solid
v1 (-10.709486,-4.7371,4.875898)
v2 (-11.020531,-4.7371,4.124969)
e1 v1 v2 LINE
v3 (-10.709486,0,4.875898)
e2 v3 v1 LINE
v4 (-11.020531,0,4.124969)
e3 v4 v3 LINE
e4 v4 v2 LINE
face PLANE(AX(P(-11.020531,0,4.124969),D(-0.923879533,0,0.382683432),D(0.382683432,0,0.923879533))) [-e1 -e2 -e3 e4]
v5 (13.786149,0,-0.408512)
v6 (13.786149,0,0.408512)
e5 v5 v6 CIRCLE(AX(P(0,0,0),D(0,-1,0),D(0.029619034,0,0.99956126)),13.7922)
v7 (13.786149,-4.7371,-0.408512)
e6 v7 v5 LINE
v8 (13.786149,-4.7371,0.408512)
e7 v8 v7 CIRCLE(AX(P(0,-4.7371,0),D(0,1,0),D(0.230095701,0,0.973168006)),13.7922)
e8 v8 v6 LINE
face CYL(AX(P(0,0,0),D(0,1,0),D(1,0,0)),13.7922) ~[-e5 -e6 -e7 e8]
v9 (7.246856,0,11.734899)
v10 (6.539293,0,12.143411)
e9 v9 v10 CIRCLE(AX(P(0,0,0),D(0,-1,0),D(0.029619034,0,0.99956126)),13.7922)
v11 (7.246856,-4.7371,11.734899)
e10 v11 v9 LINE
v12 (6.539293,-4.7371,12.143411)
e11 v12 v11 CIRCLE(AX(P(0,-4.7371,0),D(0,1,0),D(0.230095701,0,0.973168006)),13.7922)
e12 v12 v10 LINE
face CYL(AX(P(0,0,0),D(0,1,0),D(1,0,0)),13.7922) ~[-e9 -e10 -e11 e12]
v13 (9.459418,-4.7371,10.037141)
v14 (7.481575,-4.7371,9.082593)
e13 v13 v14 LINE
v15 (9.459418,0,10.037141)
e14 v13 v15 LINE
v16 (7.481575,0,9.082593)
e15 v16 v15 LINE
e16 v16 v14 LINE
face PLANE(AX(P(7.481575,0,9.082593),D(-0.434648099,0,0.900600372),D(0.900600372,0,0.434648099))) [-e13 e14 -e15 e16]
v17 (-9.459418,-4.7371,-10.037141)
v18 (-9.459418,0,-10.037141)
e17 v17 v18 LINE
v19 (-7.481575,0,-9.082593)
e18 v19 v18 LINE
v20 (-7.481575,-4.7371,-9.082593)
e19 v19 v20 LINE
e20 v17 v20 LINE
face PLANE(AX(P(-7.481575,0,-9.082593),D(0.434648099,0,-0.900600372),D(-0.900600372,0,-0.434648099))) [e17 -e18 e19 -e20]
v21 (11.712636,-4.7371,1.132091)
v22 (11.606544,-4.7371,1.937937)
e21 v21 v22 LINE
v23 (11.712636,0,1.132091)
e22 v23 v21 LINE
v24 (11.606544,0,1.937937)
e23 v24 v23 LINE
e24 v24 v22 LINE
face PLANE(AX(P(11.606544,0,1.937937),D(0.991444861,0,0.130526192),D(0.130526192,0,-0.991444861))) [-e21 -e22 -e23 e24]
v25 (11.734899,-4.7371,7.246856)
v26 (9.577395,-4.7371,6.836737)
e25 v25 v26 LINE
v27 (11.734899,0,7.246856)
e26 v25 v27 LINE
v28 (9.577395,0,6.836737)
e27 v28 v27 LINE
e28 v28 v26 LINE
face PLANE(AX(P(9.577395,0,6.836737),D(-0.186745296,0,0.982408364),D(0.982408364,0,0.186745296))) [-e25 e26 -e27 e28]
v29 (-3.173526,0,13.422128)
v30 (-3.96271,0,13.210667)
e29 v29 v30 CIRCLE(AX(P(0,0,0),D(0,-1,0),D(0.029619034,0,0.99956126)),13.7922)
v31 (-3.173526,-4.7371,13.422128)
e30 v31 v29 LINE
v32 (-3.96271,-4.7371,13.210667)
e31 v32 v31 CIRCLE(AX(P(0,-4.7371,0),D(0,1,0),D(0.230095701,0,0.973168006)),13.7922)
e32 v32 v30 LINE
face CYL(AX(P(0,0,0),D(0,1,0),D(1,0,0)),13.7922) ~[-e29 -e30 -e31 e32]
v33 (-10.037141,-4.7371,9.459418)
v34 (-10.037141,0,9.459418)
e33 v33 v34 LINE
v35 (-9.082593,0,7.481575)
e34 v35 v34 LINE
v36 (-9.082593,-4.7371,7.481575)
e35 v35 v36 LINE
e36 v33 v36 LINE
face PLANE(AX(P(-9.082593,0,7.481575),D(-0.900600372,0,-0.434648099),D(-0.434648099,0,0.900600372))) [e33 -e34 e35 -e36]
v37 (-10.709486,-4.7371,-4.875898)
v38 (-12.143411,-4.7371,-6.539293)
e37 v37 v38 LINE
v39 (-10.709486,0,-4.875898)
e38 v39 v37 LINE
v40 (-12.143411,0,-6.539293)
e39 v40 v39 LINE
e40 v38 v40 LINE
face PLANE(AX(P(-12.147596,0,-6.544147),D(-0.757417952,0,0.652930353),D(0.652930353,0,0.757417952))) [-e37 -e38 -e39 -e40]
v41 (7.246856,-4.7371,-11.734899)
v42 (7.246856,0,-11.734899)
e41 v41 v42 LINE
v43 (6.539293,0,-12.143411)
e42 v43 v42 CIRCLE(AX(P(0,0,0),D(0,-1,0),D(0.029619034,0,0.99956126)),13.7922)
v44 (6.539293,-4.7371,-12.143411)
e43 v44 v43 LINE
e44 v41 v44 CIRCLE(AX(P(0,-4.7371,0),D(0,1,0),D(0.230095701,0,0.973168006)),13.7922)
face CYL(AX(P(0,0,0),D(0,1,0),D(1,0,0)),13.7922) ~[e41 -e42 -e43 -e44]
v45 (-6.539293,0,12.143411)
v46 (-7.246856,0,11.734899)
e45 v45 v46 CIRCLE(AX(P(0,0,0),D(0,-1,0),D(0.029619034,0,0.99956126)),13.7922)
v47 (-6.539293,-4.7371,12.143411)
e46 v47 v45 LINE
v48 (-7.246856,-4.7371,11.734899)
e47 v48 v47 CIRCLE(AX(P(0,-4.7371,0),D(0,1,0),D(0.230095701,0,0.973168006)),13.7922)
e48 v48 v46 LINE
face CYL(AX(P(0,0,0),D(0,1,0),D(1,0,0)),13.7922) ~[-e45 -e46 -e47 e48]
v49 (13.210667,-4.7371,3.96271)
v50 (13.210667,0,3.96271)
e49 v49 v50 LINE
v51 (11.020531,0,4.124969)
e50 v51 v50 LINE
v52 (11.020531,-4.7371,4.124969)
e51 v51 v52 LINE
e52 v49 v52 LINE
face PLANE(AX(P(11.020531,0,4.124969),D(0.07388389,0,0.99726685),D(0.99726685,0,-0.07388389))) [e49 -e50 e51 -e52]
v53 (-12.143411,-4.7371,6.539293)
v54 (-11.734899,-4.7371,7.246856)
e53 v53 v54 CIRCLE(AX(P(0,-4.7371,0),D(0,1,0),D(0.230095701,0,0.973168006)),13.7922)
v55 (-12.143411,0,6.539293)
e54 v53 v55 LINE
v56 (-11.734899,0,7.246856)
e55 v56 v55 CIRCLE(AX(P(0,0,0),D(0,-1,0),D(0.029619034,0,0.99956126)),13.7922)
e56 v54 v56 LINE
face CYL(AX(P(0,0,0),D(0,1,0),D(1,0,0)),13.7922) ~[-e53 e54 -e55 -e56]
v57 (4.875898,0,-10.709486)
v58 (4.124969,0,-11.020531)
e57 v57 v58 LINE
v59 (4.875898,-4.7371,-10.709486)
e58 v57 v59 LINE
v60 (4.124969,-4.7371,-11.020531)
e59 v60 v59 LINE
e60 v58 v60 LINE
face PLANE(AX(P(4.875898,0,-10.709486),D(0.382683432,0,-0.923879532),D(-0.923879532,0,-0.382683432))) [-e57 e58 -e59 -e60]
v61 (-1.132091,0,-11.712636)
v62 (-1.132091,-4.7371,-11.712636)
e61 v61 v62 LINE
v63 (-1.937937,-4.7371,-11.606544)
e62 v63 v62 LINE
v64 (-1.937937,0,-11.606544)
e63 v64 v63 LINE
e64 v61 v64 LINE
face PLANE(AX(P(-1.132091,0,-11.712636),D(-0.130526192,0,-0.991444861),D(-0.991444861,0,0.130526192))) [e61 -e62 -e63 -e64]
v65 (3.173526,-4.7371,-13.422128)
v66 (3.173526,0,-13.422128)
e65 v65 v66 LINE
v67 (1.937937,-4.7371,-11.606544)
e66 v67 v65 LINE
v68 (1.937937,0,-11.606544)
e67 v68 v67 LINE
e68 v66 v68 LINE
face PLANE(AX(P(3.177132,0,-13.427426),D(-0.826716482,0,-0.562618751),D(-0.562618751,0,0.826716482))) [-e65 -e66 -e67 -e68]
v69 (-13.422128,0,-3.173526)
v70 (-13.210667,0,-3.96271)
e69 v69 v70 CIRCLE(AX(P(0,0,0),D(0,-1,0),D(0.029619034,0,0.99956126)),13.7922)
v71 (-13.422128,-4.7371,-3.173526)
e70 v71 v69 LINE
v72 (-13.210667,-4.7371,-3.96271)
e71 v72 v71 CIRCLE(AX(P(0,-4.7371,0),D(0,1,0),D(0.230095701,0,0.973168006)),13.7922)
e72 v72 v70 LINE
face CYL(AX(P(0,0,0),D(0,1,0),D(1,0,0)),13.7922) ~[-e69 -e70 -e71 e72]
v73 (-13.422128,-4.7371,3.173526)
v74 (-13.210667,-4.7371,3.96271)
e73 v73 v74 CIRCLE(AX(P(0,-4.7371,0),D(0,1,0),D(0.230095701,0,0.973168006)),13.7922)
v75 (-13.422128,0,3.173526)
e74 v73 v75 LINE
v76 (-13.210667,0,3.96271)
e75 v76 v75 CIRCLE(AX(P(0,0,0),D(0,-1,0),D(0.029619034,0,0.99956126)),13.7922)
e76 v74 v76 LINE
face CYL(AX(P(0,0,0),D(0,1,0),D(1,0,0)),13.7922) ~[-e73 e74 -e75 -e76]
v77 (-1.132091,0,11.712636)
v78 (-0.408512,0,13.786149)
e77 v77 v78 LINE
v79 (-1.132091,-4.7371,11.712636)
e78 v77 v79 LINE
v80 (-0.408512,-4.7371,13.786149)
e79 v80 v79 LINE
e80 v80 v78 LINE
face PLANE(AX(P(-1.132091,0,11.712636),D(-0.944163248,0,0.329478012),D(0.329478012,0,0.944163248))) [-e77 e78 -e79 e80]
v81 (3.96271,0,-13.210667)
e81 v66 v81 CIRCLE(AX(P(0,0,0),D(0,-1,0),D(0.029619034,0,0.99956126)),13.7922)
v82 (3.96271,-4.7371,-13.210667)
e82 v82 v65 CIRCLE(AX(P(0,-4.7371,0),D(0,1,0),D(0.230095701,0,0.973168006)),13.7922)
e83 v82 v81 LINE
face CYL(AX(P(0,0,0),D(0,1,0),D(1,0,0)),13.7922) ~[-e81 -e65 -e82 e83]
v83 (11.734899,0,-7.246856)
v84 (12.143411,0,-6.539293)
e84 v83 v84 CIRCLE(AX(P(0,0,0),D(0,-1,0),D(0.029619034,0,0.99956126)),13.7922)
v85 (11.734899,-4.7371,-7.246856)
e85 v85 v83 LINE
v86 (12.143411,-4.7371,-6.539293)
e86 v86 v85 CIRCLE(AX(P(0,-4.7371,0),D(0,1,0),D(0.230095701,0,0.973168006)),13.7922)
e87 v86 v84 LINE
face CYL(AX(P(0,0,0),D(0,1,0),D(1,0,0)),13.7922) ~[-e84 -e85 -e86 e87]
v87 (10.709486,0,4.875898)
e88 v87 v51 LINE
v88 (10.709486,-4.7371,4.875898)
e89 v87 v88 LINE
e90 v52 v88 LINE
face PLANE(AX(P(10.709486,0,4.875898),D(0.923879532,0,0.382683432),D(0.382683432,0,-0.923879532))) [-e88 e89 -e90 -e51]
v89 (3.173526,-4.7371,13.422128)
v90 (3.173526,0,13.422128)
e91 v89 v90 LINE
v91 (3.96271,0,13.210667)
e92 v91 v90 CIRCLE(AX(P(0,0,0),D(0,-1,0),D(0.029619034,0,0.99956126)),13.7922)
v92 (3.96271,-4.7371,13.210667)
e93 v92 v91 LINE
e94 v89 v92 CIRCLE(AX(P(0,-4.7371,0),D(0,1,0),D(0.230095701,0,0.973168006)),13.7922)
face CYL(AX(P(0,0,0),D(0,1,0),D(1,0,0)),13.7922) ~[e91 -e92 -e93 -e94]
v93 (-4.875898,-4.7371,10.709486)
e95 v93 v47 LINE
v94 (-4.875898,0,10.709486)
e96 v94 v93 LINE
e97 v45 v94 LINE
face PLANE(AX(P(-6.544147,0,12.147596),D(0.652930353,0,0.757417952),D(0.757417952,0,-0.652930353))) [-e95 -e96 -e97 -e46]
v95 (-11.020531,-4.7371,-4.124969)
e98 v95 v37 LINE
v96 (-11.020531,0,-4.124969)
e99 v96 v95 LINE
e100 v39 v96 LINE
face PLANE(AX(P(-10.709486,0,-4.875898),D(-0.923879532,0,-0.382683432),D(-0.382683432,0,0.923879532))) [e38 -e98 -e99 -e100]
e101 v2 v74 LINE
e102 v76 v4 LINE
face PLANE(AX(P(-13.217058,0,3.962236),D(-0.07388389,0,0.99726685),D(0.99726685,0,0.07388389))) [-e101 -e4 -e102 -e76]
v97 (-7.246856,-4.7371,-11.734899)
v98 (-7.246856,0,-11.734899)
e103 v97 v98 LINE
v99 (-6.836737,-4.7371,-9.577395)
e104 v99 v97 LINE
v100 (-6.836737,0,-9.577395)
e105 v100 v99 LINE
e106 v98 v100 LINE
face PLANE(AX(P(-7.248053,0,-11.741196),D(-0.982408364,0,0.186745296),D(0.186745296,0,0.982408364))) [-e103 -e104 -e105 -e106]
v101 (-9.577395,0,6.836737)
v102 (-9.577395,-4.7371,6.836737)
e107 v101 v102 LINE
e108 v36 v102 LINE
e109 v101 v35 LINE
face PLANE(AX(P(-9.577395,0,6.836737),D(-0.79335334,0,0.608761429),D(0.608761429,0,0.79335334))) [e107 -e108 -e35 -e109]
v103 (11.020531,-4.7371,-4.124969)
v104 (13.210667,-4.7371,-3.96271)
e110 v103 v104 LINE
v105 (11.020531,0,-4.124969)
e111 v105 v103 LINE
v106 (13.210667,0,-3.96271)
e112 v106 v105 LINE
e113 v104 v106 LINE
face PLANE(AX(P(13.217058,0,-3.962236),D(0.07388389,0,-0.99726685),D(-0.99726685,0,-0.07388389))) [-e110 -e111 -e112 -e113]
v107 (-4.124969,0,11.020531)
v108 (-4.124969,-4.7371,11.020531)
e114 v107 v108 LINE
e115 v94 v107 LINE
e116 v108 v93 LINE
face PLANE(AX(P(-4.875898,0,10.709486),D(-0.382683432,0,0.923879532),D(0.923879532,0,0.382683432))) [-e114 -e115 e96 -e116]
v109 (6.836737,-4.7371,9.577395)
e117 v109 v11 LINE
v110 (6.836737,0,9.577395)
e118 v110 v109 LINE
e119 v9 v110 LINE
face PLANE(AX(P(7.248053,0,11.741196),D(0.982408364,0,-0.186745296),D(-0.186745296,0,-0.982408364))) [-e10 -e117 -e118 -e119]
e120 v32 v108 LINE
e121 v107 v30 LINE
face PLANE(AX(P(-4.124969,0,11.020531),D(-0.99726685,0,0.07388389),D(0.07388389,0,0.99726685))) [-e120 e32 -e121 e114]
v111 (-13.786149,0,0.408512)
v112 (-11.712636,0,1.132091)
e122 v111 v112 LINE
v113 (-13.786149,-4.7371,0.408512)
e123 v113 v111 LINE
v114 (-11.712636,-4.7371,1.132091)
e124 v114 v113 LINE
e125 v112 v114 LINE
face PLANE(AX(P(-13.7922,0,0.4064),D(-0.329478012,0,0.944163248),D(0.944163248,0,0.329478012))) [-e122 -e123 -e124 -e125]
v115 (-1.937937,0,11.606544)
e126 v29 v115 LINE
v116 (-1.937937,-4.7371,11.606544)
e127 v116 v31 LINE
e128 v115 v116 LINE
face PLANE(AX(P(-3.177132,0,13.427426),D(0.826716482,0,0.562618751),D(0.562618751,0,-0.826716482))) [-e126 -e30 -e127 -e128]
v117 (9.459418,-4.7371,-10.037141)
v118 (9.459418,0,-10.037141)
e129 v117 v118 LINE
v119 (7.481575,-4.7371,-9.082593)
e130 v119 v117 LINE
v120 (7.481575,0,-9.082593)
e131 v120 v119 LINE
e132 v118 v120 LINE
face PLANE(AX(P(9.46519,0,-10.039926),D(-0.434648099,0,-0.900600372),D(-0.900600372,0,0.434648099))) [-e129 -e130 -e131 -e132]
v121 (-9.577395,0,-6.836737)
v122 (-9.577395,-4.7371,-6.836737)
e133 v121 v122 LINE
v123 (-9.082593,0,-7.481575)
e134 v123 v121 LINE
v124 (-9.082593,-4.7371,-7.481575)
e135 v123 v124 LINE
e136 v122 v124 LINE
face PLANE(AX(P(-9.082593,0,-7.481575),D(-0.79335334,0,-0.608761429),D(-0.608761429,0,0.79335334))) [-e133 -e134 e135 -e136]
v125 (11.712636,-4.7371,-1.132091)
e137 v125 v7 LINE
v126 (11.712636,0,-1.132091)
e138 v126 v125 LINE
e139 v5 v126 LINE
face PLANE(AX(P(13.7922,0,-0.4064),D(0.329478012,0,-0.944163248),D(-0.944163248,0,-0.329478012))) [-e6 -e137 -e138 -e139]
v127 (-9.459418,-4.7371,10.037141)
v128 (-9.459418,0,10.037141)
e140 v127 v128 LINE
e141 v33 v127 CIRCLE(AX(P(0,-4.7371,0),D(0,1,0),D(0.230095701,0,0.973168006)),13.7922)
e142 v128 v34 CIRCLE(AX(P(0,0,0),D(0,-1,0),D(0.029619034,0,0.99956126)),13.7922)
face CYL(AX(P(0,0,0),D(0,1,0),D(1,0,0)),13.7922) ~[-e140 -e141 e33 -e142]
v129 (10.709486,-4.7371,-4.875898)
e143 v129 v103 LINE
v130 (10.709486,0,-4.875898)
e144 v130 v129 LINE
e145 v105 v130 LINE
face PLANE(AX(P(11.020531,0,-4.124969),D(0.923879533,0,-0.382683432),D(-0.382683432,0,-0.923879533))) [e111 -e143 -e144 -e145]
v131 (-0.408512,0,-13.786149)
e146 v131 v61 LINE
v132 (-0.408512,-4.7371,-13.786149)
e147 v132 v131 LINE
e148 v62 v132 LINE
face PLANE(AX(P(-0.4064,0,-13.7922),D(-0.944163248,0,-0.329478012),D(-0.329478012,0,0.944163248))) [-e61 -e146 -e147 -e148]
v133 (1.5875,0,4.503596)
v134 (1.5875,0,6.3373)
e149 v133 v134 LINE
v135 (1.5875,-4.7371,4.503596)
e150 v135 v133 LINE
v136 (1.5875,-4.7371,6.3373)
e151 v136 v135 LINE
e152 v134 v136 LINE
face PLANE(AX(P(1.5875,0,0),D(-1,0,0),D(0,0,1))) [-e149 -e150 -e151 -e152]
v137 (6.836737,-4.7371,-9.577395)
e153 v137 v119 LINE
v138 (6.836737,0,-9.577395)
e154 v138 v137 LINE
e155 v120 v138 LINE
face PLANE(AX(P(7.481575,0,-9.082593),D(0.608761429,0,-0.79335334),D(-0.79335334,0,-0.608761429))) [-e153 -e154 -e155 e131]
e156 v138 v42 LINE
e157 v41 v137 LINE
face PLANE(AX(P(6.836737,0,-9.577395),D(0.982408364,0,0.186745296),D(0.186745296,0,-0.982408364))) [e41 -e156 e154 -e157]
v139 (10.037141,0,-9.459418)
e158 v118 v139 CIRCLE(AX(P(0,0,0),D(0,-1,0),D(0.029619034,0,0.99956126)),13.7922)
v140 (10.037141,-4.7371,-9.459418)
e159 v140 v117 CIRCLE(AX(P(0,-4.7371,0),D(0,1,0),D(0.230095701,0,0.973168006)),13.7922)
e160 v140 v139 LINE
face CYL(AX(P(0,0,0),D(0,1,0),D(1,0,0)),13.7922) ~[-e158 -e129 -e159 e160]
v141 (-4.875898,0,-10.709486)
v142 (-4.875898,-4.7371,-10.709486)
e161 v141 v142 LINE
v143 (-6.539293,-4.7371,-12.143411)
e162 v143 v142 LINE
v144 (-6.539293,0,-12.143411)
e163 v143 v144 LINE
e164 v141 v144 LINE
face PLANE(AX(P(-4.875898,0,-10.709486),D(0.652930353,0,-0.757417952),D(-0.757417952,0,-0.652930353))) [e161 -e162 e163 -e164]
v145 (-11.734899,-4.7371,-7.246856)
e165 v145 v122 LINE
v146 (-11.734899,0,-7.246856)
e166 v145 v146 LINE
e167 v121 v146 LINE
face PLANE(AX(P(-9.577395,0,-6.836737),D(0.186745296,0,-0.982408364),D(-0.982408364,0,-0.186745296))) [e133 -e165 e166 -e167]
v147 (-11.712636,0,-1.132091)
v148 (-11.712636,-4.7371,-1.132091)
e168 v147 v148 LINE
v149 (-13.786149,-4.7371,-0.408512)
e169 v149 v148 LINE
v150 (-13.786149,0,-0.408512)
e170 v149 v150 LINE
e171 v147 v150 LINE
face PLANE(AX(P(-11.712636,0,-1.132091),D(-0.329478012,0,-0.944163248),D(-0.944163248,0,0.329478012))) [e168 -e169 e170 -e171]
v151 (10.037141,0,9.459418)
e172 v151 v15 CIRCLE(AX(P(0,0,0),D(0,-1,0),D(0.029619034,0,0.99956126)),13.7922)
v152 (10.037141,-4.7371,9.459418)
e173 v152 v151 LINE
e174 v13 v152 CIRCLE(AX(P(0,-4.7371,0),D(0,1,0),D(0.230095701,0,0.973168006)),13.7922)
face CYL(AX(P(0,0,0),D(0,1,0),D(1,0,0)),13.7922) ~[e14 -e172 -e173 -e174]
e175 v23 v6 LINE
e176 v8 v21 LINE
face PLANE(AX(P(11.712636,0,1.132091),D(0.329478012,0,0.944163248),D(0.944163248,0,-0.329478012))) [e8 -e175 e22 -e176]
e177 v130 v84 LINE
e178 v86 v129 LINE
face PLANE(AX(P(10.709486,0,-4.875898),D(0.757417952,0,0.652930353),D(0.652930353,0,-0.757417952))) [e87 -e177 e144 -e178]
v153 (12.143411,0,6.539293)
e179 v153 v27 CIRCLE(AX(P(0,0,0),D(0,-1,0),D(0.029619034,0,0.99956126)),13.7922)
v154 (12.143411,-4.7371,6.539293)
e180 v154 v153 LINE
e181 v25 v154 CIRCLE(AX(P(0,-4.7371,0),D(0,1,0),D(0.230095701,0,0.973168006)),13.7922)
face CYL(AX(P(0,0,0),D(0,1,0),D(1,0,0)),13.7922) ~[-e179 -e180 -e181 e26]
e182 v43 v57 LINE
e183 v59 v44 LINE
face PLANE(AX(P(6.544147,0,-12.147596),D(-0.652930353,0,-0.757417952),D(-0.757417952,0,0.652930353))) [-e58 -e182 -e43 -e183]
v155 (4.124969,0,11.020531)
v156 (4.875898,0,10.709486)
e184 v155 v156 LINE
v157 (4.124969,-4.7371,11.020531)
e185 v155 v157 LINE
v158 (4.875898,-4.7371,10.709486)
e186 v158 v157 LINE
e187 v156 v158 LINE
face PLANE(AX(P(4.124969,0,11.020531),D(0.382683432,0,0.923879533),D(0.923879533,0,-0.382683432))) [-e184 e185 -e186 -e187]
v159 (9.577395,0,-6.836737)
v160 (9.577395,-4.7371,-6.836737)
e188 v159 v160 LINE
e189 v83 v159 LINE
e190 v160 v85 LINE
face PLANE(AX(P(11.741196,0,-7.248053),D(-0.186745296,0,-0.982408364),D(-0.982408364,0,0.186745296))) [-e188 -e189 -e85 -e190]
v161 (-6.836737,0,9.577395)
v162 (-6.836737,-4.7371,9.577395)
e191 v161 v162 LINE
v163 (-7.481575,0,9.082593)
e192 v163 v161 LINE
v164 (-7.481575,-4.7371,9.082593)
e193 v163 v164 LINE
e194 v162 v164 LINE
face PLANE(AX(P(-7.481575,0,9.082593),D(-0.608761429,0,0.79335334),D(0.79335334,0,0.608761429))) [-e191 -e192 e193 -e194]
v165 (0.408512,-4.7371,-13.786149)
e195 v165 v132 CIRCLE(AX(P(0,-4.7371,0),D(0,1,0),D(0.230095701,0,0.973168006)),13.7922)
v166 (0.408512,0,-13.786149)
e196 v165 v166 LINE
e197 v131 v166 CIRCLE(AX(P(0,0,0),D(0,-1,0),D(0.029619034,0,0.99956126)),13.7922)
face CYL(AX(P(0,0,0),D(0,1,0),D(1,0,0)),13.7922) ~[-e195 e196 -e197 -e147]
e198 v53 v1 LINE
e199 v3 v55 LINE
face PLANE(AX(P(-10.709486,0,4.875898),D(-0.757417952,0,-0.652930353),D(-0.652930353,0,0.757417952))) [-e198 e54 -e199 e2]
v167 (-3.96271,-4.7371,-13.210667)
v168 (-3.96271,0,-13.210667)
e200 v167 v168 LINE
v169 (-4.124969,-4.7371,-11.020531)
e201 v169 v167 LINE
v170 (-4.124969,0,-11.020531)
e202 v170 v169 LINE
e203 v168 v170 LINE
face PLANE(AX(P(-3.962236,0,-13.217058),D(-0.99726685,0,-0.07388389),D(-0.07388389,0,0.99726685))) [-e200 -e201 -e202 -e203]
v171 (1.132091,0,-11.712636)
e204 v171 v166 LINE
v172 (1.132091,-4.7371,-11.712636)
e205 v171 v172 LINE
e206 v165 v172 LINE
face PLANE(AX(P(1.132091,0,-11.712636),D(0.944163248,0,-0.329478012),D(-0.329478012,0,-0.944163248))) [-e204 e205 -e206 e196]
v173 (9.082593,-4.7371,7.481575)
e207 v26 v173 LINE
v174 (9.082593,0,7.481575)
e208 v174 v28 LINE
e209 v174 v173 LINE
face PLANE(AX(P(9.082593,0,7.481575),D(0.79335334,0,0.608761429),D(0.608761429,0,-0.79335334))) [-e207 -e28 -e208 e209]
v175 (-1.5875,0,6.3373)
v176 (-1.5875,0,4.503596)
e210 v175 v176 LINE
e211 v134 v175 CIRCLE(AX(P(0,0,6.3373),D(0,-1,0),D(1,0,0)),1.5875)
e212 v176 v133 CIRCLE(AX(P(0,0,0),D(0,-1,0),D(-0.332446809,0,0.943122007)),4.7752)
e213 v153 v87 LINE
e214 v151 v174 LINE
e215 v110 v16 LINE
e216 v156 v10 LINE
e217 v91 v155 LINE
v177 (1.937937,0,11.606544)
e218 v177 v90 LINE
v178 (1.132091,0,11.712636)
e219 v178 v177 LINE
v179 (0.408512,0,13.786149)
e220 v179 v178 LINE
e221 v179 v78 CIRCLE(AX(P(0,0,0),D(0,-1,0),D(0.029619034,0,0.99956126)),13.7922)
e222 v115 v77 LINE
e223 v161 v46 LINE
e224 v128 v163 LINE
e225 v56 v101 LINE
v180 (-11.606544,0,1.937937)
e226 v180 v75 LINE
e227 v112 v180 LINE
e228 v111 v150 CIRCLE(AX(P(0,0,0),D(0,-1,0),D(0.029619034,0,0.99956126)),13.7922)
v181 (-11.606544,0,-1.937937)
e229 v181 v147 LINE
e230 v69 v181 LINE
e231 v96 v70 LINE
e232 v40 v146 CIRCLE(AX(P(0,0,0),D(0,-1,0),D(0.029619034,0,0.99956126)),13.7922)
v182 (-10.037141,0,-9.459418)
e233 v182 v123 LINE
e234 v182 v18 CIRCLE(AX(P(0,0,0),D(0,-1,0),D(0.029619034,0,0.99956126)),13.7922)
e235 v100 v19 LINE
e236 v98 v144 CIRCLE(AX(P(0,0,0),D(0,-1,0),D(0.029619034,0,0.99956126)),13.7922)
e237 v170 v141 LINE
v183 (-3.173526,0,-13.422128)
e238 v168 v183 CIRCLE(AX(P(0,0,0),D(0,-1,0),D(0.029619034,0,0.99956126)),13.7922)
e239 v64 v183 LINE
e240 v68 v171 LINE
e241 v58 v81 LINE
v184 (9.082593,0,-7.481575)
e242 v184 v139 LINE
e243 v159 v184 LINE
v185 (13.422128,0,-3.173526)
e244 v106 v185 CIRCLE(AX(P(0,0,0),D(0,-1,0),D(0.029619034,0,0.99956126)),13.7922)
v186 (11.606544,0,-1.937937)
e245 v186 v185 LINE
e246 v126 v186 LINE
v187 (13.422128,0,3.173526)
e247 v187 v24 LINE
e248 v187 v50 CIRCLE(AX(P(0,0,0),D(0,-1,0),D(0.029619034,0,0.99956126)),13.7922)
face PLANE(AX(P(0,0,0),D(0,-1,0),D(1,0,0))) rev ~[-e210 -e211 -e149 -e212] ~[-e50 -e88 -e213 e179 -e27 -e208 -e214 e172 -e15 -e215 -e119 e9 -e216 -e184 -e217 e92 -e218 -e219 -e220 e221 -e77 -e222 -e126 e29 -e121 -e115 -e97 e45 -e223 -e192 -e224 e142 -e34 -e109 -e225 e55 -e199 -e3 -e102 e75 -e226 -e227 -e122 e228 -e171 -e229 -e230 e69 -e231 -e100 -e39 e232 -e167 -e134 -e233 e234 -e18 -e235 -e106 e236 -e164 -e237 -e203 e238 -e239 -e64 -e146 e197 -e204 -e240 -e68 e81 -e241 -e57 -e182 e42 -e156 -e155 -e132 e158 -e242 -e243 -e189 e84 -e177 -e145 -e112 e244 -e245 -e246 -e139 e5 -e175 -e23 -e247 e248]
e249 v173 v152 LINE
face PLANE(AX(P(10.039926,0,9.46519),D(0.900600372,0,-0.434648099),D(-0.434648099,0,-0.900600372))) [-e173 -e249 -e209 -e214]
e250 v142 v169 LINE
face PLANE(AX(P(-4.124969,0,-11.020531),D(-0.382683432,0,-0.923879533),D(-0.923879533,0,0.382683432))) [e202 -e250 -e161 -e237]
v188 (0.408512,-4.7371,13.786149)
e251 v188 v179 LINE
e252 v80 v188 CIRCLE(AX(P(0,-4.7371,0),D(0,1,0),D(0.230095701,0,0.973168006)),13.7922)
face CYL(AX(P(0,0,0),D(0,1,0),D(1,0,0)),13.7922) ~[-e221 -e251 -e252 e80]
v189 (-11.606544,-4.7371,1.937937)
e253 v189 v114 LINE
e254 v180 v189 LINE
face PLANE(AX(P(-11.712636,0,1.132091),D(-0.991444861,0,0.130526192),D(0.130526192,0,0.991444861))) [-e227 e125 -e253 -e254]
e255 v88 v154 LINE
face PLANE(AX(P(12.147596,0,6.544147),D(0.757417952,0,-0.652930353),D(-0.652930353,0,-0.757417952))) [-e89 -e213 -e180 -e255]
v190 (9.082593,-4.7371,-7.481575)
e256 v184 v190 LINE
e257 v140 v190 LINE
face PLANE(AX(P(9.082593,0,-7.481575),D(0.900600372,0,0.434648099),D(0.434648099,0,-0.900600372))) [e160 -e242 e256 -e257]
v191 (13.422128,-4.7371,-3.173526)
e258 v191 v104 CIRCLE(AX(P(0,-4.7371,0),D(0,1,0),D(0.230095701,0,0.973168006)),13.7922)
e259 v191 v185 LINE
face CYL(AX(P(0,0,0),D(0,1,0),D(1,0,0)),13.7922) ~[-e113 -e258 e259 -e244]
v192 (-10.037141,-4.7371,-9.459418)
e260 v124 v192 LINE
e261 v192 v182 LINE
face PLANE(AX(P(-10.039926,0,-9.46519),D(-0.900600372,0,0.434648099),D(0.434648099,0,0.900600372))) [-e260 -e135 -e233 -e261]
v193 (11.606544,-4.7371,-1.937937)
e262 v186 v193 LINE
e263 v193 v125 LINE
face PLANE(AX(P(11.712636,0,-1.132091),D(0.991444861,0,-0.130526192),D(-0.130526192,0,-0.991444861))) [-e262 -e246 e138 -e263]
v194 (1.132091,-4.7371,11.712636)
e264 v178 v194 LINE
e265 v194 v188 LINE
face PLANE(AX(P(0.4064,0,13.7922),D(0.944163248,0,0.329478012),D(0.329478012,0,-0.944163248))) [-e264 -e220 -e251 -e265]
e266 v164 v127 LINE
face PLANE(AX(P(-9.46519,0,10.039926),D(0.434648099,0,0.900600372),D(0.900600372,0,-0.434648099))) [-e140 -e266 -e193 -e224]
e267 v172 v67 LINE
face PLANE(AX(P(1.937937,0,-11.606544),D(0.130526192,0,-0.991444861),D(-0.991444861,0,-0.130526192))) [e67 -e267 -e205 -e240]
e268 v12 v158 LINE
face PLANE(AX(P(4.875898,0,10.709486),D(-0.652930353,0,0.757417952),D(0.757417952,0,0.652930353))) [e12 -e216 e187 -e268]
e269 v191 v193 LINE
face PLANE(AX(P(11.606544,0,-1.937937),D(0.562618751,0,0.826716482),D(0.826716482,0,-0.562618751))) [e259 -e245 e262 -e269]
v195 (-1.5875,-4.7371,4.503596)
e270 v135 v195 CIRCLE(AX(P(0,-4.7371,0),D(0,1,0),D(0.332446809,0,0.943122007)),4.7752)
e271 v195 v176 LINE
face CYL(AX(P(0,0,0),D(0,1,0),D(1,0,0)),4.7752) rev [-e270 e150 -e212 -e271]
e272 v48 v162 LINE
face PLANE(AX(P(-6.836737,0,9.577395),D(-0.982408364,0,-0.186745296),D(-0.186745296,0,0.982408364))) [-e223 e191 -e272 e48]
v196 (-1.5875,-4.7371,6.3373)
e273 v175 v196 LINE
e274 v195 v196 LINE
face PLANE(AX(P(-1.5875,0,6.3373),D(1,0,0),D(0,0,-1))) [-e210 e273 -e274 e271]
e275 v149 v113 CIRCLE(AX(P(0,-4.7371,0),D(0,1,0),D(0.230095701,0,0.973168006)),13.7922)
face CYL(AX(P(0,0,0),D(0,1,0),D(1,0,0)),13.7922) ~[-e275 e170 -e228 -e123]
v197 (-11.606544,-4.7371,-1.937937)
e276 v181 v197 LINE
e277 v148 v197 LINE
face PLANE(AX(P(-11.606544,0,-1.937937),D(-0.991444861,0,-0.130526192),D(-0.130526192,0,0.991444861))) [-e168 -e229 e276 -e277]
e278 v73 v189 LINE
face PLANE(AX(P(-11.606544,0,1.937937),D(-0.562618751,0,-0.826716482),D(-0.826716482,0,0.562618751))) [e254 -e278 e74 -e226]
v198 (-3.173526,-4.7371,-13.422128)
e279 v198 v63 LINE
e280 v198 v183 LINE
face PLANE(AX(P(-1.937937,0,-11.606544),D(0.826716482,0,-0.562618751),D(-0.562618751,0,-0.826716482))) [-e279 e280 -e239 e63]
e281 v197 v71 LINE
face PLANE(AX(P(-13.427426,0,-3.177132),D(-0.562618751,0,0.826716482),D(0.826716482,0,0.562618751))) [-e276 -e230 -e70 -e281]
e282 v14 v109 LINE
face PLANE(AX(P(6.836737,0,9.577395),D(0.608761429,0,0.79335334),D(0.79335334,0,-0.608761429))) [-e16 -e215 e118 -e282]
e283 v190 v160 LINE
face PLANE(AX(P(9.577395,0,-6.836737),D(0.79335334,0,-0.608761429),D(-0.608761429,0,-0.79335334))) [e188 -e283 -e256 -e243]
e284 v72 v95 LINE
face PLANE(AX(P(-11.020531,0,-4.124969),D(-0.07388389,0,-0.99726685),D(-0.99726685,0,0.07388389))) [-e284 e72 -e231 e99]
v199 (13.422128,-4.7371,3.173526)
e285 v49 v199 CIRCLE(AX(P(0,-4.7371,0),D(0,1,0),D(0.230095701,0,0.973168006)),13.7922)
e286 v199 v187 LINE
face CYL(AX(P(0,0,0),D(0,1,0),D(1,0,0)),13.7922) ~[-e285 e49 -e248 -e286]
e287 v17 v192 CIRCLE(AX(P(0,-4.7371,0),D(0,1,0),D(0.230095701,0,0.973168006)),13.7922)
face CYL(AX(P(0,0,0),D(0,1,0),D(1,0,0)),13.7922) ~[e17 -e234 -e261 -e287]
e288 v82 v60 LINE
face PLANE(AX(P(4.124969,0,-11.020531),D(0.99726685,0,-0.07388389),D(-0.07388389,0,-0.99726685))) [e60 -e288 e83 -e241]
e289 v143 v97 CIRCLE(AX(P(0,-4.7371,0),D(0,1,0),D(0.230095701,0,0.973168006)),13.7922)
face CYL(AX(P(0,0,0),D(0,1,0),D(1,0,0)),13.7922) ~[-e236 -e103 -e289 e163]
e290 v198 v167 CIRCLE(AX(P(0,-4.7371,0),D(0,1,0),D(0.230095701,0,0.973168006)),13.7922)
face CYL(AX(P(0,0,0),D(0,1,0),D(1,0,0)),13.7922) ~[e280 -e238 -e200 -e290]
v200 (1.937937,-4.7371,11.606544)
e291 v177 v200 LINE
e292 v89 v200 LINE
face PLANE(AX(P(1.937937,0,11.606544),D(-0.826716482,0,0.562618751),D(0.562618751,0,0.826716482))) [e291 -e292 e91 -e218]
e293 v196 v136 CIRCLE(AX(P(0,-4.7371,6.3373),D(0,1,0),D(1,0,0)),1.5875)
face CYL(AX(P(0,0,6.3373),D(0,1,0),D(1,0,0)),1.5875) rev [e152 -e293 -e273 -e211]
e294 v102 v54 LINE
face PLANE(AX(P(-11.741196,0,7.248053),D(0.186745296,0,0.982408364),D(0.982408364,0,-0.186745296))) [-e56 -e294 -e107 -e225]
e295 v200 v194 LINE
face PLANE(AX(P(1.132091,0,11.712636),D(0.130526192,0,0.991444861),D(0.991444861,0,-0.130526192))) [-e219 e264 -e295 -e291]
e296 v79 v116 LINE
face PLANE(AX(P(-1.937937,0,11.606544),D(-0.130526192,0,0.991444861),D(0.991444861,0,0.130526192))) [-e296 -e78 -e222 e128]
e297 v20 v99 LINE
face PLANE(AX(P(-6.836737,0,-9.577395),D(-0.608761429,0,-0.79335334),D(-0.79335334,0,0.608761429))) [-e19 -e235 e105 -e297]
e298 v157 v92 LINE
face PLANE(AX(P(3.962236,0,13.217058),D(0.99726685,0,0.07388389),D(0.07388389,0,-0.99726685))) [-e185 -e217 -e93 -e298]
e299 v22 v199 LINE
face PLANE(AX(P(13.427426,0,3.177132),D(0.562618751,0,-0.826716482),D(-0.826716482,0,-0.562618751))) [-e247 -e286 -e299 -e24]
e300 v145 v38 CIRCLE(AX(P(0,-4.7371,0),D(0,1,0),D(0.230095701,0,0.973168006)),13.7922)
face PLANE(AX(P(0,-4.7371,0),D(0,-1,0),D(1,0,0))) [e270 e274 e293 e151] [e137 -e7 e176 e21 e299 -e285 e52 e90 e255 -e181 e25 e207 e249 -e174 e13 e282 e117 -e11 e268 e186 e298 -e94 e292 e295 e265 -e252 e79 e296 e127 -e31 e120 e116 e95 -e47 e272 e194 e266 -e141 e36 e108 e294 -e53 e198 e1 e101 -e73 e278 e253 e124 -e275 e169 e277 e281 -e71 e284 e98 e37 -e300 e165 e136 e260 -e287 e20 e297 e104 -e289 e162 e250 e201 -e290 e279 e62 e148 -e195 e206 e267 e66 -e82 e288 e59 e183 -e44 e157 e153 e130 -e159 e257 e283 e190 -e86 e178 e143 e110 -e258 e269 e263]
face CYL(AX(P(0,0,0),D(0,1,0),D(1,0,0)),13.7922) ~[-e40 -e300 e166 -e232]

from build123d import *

# Parameters (mm, degrees)
F0_R            = 13.7922
F0_R_2          = 4.7752
F1_DEPTH        = 4.7371
F3_DEPTH        = 4.7381
F5_DEPTH        = 4.7381
F5_COPIES_COUNT = 24


# Not quite as in the source:
# - a pattern or mirror of a feature is missing from the dataset's text; its kind, count and spacing are read off the source's solid


with BuildPart() as f1:
    # F0 (on Front) → F1 (new body)
    with BuildSketch(Plane.XZ):
        Circle(F0_R)
        Circle(F0_R_2, mode=Mode.SUBTRACT)
    extrude(amount=F1_DEPTH)

    # F2 (on Front) → F3 (cut, through all)
    with BuildSketch(Plane.XZ):
        with BuildLine():
            Line((-1.5875, 6.3373), (-1.5875, 0))
            Line((-1.5875, 0), (1.5875, 0))
            Line((1.5875, 0), (1.5875, 6.3373))
            ThreePointArc((1.5875, 6.3373), (0, 7.9248), (-1.5875, 6.3373))
        make_face()
    extrude(amount=F3_DEPTH, mode=Mode.SUBTRACT)

    # F4 (on Front) → F5 (cut, through all)
    with BuildSketch(Plane.XZ):
        with BuildLine():
            Line((0.4064, 13.7922), (1.1320909341, 11.7126357032))
            Line((1.1320909341, 11.7126357032), (1.9379373174, 11.6065440142))
            Line((1.9379373174, 11.6065440142), (3.1771317781, 13.4274262413))
            ThreePointArc((3.1771317781, 13.4274262413), (1.8061892107, 13.7193691256), (0.4064, 13.7922))
        make_face()
    f5 = extrude(amount=F5_DEPTH, mode=Mode.SUBTRACT)

    # F5_copies: F5 ×24 about axis
    f5_copies_axis = Axis((0, 0, 0), (0, 1, 0))
    for i in range(1, F5_COPIES_COUNT):
        add(f5.rotate(f5_copies_axis, i * 360 / F5_COPIES_COUNT), mode=Mode.SUBTRACT)


solid = f1.part
